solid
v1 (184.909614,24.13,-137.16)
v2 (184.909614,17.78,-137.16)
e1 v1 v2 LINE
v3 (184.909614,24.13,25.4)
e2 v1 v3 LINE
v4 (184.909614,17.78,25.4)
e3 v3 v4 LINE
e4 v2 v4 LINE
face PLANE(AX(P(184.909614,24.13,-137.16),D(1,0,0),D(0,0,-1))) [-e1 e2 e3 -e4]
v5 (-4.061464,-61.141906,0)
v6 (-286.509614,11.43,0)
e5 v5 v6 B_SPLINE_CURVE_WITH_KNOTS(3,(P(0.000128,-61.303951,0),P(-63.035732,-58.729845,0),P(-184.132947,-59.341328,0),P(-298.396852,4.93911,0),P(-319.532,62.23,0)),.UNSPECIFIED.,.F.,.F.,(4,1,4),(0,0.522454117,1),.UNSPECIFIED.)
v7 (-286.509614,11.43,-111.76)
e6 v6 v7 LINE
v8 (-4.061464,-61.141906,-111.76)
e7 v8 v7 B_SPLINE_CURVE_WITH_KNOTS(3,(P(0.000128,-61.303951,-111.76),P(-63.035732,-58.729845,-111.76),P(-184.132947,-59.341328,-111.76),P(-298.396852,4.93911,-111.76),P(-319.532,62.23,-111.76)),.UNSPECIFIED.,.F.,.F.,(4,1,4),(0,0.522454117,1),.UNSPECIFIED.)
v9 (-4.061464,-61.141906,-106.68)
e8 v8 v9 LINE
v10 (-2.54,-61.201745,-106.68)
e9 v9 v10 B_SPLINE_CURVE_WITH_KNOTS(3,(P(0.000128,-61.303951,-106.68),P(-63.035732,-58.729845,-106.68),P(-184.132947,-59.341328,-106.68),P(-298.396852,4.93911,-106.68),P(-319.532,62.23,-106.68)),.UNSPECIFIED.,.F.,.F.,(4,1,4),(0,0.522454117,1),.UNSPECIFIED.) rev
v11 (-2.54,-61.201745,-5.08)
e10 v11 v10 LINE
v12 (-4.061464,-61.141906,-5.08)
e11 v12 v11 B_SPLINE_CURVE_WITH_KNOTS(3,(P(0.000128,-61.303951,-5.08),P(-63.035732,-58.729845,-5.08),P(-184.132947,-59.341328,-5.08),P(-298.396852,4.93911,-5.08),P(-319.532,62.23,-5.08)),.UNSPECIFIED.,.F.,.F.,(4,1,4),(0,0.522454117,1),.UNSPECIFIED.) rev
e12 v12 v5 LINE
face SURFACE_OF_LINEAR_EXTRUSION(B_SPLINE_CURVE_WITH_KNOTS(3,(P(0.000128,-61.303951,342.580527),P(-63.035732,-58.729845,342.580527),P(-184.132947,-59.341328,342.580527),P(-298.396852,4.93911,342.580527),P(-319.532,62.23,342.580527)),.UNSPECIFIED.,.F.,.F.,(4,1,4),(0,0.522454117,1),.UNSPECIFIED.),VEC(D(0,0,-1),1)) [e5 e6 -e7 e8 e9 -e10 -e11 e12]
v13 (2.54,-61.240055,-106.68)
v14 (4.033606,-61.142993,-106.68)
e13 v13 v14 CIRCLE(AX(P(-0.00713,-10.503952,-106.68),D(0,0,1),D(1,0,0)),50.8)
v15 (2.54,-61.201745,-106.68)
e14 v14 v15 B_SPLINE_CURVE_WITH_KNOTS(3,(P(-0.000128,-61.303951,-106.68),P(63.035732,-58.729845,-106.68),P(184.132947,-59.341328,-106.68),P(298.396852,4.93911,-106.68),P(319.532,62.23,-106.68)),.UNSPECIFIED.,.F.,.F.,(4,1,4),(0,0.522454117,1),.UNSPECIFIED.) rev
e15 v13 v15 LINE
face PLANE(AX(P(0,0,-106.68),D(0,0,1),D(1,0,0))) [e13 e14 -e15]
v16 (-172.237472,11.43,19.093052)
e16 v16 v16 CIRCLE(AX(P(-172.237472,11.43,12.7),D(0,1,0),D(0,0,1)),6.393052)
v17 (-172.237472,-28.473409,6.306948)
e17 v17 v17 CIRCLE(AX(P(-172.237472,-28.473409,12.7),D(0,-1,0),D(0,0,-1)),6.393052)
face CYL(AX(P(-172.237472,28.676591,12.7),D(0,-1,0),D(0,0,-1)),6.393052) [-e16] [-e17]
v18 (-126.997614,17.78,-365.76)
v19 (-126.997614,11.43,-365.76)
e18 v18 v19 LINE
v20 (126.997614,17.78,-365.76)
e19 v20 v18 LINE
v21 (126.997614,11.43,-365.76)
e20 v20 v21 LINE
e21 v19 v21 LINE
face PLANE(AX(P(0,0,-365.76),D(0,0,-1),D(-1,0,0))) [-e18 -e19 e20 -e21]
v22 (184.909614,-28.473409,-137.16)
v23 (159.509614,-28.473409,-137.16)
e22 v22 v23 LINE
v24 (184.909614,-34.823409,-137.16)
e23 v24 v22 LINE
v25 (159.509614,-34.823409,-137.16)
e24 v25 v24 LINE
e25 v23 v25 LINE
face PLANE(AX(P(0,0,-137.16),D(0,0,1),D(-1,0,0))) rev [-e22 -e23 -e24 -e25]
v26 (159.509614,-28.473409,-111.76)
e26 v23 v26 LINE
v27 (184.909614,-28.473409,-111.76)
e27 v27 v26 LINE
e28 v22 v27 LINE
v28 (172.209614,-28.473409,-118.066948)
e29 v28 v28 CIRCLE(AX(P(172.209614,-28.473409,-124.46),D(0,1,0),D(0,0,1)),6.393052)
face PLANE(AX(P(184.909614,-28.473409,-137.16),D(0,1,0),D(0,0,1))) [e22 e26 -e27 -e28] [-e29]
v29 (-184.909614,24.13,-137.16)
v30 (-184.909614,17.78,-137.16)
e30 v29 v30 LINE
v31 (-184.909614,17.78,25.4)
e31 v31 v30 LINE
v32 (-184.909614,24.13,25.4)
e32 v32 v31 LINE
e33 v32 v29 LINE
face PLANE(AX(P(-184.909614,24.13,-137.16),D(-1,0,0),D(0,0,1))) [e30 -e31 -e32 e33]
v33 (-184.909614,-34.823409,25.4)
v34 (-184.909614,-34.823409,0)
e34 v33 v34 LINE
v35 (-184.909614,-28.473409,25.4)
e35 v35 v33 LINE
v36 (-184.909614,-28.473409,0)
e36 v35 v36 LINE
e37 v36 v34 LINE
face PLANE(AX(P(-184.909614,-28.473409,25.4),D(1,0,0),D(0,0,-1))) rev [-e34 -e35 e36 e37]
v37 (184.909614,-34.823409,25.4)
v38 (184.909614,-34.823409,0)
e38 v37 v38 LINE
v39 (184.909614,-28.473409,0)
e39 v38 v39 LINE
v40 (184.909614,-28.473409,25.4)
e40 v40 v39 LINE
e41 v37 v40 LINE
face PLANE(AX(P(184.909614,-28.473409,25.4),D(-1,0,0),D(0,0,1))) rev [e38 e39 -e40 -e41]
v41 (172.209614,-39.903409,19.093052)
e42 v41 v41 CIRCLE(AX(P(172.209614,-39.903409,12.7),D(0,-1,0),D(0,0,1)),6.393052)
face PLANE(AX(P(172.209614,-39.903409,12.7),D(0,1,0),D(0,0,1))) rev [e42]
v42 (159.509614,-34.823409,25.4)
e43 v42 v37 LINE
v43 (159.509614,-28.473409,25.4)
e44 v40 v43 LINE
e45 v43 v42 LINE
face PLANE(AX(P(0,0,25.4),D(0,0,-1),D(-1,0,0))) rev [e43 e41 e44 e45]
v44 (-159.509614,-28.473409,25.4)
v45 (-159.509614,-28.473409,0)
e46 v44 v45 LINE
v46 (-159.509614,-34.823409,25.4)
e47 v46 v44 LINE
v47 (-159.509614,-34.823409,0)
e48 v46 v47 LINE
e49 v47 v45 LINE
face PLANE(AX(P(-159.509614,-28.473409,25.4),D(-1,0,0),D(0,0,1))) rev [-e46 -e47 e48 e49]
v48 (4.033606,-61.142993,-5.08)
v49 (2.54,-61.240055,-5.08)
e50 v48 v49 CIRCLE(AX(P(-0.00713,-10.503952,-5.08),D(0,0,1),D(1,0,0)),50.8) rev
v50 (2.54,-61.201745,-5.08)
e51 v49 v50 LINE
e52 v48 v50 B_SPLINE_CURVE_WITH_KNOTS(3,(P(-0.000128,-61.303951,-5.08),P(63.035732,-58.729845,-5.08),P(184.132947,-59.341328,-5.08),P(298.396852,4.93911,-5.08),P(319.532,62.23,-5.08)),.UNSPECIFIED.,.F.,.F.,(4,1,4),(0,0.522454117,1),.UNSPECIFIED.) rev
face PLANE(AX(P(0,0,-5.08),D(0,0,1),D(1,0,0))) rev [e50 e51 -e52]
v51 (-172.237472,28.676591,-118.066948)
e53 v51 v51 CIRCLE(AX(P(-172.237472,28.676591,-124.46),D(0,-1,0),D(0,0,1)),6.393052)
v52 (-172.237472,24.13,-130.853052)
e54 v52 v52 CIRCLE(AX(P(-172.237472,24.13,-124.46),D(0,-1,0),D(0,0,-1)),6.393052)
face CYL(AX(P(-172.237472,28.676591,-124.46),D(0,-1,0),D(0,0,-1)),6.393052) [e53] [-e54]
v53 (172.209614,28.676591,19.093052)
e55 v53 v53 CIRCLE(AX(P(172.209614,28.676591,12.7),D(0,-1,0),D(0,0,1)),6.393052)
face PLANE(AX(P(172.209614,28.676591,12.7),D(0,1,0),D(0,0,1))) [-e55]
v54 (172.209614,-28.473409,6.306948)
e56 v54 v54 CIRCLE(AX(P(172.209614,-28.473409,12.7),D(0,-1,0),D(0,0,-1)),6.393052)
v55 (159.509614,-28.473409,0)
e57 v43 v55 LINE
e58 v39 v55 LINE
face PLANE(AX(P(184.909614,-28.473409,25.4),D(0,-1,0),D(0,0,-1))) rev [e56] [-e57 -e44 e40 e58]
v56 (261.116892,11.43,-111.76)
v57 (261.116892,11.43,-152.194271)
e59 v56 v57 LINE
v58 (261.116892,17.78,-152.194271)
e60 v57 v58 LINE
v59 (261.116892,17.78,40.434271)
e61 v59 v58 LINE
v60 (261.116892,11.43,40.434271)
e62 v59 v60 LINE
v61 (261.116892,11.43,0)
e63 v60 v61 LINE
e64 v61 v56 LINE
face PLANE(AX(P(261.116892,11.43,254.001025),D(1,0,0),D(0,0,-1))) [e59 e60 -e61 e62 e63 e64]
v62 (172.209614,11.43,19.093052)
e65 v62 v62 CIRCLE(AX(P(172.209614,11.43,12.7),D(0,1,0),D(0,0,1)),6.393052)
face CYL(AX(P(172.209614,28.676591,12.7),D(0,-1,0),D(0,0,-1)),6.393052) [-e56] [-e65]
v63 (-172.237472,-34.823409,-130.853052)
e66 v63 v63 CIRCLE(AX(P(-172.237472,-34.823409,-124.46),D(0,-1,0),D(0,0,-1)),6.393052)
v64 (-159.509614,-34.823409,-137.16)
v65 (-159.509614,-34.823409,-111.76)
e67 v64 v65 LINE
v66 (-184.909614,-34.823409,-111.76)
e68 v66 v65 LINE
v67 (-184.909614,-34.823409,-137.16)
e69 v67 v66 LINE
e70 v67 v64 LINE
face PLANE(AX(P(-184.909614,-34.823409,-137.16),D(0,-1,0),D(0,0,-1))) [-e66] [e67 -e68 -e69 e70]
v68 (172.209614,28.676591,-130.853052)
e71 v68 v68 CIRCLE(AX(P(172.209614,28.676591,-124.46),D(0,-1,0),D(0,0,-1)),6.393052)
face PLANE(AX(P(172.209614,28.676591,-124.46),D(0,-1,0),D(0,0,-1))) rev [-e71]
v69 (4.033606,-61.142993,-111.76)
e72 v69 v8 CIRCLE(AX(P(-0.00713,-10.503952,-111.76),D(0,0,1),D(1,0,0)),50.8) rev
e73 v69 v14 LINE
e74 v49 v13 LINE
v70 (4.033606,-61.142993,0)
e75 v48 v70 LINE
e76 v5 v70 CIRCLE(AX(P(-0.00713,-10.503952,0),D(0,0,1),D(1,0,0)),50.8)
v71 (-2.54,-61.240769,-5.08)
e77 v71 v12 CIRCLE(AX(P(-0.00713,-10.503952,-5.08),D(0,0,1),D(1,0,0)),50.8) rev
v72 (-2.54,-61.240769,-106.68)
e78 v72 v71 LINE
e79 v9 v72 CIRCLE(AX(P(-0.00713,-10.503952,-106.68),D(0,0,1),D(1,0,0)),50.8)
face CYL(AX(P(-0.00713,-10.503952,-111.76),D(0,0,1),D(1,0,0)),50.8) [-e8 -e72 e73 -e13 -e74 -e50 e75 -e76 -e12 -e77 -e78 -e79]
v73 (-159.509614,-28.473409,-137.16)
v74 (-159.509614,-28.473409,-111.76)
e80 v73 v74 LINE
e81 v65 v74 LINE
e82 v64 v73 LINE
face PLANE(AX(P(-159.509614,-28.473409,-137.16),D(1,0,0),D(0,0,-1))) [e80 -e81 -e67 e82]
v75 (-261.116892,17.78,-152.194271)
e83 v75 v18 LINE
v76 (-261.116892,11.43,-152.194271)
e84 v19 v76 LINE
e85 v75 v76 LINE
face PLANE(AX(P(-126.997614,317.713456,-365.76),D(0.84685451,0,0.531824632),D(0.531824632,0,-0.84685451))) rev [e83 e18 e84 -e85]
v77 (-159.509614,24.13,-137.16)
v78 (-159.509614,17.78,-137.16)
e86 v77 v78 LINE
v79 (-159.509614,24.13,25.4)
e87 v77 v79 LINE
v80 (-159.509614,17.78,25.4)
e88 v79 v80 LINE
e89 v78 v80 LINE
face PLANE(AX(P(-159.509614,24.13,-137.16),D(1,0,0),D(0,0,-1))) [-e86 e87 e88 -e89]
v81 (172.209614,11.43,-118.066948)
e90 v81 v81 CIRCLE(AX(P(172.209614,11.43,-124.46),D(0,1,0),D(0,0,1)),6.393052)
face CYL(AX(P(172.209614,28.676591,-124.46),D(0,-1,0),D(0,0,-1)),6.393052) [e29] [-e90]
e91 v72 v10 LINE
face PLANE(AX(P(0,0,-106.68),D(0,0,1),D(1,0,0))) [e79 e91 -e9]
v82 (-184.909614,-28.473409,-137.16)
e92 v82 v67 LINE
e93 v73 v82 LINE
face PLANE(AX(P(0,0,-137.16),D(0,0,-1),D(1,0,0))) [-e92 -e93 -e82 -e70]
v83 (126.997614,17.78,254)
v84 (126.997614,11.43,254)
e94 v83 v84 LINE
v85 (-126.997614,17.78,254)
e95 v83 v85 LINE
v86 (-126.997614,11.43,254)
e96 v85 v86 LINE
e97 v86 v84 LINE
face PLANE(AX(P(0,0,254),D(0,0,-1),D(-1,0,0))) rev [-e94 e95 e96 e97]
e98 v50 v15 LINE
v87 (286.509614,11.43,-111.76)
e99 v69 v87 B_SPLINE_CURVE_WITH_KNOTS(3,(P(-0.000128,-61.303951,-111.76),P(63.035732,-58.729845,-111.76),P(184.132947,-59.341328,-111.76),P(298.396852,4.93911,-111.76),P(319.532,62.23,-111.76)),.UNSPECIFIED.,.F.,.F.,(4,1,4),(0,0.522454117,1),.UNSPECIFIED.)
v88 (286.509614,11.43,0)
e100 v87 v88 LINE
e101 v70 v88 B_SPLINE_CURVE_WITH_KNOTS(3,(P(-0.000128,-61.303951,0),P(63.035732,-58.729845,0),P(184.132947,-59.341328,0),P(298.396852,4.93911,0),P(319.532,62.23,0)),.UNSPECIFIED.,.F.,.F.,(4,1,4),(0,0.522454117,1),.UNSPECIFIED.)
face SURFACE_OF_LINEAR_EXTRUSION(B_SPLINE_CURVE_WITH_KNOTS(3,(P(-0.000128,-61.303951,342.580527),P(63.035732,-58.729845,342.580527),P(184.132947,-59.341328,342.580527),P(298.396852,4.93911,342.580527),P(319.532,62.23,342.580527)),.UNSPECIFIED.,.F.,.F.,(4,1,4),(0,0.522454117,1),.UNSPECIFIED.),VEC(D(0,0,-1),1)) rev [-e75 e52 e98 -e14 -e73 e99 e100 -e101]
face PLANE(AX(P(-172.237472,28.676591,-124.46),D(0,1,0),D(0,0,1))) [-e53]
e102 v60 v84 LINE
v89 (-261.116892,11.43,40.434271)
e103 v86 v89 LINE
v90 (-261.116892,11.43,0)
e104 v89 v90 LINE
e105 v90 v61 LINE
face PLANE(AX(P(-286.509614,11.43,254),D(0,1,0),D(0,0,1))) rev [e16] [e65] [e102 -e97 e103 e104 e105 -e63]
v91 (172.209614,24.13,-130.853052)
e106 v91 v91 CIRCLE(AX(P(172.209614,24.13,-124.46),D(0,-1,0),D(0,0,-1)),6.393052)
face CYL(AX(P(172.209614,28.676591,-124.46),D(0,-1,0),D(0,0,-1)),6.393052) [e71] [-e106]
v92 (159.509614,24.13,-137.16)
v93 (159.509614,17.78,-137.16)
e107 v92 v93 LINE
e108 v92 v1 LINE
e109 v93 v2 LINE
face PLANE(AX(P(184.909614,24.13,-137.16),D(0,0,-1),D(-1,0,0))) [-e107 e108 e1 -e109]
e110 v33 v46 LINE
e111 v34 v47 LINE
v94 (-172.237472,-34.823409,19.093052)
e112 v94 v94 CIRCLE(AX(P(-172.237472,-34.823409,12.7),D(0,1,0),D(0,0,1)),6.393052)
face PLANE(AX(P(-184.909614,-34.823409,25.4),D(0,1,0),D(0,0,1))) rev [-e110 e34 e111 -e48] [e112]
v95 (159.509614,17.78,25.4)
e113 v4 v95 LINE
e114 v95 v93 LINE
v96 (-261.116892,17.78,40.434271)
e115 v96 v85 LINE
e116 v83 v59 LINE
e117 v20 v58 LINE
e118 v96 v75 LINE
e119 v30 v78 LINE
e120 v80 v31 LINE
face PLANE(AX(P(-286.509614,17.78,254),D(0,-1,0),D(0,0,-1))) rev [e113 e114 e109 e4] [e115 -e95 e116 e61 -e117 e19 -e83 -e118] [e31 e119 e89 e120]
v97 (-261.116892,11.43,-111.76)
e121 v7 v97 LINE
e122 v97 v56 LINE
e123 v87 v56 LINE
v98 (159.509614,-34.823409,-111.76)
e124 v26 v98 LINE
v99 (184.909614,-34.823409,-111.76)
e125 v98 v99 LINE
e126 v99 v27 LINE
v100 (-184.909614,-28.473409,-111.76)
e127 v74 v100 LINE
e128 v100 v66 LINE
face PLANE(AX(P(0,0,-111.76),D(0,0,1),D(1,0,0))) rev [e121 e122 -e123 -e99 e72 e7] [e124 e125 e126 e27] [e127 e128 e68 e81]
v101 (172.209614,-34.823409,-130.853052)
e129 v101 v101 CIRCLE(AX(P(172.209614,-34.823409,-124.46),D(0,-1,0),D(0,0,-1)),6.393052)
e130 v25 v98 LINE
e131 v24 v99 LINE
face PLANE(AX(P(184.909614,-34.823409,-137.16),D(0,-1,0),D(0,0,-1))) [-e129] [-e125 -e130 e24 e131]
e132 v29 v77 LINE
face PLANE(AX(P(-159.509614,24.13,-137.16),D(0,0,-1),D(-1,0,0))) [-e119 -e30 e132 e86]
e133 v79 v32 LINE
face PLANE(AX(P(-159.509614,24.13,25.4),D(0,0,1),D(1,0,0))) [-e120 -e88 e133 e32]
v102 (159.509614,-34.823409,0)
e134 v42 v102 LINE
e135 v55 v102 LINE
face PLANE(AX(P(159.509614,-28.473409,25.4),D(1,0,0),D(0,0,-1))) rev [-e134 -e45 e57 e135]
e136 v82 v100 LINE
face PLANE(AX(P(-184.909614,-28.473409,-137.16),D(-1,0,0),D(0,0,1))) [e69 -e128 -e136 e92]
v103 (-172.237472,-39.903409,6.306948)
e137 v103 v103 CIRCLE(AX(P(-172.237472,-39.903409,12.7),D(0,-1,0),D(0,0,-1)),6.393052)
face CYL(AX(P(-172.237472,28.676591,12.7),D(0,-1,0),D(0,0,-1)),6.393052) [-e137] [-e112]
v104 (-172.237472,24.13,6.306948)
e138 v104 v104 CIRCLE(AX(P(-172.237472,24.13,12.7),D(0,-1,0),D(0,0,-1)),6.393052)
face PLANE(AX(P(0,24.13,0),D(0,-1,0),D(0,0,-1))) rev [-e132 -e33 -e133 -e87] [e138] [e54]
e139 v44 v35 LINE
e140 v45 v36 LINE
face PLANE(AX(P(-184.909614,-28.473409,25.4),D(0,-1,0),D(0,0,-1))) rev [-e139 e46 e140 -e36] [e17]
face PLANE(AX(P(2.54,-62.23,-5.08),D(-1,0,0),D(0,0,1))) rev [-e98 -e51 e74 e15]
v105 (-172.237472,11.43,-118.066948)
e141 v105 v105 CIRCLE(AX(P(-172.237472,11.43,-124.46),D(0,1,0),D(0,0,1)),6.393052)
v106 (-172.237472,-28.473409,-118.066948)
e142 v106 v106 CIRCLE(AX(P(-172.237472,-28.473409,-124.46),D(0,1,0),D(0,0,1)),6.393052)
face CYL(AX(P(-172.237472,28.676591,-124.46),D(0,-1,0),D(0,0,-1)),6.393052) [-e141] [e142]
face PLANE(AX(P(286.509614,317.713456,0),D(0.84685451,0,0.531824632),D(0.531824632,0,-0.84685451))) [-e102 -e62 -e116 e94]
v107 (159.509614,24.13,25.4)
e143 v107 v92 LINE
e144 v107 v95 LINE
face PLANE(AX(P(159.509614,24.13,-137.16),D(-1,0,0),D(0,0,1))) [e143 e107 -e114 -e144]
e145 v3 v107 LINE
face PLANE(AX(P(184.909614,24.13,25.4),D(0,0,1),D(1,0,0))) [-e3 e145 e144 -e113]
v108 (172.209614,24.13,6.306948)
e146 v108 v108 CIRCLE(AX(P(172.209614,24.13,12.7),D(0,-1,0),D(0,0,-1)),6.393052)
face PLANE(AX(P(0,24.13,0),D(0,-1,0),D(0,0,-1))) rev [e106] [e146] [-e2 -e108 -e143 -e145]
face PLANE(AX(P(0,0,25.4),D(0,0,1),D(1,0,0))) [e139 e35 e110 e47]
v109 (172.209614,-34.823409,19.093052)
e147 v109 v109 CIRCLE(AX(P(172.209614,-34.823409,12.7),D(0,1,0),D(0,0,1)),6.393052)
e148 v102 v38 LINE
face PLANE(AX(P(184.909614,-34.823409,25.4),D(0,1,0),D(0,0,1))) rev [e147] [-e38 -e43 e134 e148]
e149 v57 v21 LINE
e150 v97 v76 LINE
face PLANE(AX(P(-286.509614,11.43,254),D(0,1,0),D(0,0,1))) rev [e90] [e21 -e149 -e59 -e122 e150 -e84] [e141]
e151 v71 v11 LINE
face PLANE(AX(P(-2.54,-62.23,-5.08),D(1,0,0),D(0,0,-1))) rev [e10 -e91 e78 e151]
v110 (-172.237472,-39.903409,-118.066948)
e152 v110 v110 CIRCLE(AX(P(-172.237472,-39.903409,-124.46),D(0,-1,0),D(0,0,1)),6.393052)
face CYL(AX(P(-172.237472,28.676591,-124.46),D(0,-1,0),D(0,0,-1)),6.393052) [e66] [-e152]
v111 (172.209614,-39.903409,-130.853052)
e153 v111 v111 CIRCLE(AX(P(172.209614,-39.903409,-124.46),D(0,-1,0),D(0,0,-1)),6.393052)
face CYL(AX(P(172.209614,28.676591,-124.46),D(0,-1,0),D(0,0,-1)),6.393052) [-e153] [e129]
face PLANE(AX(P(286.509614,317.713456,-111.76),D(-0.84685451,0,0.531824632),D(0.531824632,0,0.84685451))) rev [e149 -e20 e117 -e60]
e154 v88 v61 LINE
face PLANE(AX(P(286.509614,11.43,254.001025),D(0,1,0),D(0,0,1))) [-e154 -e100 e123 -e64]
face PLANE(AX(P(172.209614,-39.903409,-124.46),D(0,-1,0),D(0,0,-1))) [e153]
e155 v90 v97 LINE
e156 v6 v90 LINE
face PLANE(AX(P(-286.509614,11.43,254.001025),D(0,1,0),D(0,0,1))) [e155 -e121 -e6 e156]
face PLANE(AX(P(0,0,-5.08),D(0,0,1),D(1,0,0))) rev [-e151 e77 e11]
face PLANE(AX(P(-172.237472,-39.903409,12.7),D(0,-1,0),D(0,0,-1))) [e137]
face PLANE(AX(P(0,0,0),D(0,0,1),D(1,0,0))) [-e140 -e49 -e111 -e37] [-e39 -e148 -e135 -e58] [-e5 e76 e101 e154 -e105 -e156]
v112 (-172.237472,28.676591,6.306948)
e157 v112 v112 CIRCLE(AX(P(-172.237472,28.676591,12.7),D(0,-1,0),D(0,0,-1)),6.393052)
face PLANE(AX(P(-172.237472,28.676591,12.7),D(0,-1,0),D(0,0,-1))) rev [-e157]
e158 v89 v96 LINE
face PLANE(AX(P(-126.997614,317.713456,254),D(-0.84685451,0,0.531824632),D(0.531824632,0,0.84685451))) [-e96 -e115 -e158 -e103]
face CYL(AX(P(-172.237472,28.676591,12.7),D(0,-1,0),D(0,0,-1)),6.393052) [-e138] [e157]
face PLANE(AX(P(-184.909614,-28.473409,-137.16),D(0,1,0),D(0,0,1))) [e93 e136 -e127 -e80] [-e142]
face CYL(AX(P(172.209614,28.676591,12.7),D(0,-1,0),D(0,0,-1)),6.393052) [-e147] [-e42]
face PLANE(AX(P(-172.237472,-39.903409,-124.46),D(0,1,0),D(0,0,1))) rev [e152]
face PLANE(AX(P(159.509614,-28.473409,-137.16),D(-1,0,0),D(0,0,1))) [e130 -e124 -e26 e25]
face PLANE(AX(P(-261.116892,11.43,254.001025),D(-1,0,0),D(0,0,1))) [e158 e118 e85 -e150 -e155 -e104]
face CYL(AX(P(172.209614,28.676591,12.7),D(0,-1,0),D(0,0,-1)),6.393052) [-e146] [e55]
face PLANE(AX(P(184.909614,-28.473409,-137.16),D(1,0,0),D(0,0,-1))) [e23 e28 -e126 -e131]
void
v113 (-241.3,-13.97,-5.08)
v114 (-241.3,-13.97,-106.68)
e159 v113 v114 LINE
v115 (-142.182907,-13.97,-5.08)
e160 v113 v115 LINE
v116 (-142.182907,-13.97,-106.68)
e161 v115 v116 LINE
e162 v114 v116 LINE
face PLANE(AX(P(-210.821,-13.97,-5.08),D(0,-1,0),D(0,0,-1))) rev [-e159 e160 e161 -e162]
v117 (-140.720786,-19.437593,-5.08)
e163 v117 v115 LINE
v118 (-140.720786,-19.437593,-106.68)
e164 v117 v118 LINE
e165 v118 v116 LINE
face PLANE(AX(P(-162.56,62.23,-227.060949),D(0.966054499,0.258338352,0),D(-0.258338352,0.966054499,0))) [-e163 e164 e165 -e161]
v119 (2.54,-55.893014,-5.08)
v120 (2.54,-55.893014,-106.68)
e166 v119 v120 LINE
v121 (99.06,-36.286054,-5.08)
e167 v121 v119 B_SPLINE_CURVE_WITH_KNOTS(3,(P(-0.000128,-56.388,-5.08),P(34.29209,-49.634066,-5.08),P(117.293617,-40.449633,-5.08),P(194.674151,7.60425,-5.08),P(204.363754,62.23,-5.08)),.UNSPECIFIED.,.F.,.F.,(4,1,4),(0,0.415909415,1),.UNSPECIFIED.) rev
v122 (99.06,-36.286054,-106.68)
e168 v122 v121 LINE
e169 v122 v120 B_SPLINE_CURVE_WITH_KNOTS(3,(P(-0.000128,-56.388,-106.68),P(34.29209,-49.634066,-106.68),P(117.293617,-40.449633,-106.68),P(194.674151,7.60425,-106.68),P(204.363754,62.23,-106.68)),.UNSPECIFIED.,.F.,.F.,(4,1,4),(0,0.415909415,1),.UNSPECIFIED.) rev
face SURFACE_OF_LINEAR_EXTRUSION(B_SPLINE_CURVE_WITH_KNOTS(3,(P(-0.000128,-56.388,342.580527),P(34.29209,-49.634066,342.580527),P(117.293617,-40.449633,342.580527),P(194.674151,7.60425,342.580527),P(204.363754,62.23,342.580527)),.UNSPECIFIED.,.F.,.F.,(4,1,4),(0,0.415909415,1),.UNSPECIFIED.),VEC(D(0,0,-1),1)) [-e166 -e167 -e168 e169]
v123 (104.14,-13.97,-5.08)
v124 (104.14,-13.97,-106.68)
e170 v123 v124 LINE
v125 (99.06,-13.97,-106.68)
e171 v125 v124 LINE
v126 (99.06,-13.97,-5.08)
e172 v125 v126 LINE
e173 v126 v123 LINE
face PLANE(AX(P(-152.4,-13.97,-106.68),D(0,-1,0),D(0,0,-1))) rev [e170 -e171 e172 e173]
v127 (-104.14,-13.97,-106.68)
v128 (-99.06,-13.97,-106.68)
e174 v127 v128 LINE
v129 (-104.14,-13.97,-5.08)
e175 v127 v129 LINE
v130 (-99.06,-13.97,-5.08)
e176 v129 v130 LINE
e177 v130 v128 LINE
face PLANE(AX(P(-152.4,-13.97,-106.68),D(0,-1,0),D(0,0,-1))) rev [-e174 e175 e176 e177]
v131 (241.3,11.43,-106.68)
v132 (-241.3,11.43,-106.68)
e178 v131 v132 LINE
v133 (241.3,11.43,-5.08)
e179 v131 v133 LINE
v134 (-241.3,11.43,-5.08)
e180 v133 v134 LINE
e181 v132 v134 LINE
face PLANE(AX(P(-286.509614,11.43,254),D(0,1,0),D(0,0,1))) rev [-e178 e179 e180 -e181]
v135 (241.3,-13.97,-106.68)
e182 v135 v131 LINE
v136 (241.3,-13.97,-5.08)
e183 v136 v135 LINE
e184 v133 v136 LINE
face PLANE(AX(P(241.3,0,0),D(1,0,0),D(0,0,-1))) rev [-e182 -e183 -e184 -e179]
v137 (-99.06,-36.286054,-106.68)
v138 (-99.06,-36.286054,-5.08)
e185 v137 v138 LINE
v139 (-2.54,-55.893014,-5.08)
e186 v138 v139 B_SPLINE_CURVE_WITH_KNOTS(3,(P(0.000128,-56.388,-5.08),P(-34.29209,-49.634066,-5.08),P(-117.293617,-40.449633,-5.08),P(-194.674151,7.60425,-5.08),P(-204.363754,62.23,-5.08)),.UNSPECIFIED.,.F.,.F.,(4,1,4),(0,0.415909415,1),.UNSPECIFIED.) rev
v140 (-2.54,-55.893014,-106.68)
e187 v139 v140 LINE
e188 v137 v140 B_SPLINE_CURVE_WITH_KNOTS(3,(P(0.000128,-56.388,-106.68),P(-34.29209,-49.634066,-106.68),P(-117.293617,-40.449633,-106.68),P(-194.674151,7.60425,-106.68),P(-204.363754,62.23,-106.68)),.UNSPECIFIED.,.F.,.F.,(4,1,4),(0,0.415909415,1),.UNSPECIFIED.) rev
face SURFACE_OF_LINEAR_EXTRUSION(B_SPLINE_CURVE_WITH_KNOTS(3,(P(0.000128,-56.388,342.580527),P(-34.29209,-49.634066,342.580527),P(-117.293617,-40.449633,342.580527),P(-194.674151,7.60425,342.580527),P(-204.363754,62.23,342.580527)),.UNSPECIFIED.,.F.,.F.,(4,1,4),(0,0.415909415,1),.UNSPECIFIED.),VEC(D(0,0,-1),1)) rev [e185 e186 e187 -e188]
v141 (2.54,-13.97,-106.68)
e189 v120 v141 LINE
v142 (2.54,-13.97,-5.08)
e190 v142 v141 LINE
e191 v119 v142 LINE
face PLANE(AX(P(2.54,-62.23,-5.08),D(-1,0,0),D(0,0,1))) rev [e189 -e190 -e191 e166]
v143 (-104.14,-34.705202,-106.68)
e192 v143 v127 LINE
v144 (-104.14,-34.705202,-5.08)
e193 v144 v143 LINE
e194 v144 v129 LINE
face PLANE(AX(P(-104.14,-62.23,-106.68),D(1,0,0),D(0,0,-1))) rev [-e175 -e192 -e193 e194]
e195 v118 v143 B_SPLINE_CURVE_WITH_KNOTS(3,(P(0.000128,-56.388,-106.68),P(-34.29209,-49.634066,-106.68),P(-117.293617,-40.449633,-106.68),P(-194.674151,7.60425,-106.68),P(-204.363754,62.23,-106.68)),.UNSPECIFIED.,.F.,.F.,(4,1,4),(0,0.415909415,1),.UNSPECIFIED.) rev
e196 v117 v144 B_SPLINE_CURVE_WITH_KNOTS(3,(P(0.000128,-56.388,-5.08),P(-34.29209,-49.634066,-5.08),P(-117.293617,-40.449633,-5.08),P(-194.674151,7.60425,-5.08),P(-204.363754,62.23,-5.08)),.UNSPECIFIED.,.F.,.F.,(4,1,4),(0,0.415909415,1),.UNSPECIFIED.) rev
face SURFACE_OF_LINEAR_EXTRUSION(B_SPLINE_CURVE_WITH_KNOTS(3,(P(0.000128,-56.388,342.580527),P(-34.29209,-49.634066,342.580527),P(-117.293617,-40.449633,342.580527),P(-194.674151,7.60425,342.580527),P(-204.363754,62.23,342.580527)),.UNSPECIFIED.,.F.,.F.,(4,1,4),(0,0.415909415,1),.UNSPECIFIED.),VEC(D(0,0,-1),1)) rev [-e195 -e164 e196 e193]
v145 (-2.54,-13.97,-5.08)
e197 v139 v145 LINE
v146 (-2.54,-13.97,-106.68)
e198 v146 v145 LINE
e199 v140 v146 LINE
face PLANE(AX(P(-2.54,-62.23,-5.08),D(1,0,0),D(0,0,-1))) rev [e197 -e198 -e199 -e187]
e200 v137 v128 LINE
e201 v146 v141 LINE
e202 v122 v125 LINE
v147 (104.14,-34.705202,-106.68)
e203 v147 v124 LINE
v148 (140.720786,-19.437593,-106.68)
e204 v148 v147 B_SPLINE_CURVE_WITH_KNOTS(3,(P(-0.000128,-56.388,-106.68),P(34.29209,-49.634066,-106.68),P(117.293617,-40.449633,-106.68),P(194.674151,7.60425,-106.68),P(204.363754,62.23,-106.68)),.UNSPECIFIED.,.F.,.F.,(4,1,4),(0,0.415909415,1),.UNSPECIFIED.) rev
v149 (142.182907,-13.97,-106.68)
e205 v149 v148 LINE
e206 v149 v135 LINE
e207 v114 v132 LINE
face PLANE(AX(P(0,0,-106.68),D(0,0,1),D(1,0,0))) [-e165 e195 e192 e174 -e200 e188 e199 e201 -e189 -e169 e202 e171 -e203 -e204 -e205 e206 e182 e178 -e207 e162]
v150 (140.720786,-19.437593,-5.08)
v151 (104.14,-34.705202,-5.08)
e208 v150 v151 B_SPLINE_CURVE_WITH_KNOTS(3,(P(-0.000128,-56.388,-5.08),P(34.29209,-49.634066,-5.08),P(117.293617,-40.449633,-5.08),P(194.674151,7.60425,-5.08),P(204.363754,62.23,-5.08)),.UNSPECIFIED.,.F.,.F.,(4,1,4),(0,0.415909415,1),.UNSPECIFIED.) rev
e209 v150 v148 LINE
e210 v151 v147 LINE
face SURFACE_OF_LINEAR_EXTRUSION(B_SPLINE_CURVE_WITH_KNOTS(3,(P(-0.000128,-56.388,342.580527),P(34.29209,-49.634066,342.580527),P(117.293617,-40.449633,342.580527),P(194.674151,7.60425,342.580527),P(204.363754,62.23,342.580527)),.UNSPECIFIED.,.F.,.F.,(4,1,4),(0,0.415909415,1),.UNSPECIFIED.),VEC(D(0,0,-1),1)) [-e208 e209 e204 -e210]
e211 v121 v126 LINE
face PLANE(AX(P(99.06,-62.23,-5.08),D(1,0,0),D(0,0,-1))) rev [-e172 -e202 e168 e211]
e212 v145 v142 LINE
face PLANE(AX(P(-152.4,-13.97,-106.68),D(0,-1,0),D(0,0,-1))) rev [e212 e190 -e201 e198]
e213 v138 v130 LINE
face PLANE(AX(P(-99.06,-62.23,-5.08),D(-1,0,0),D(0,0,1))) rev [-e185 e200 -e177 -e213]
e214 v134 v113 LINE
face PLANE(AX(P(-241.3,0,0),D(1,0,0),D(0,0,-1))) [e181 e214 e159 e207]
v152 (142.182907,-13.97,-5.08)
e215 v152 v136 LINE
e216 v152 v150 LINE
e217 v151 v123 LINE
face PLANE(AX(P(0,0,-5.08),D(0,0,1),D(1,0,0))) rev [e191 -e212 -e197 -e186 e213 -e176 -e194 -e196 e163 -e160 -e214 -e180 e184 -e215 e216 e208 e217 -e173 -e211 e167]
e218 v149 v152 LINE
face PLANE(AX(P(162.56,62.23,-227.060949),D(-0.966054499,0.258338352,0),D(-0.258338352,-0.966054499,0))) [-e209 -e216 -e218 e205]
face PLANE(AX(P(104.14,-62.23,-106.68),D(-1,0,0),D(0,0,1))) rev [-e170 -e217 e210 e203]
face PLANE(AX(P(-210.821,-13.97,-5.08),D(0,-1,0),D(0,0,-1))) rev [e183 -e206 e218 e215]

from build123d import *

# Parameters (mm, degrees)
BOSS_EXTRUDE1_DEPTH                 = 111.76
SKETCH5_W                           = 304.8
SKETCH5_H                           = 25.4
CUT_EXTRUDE3_DEPTH                  = 101.6
CUT_EXTRUDE4_DEPTH                  = 227.288199427
CUT_EXTRUDE4_DEPTH_BACK             = 227.288199427
SKETCH3_W                           = 96.52
SKETCH3_H                           = 101.6
SKETCH3_W_2                         = 48.26
CUT_EXTRUDE5_REACH                  = 288.663
SKETCH6_W                           = 38.1
SKETCH6_H                           = 50.8
SKETCH7_W                           = 81.28
SKETCH7_H                           = 50.8
BOSS_EXTRUDE2_DEPTH                 = 5.08
SKETCH9_W                           = 5.08
SKETCH9_H                           = 95.25
BOSS_EXTRUDE3_DEPTH                 = 10.16
SKETCH10_W                          = 5.08
SKETCH10_H                          = 95.206439839
BOSS_EXTRUDE4_DEPTH                 = 10.16
CUT_EXTRUDE7_REACH                  = 208.854
FILLET1_R                           = 50.8
BOSS_EXTRUDE5_REACH                 = 208.854
CUT_EXTRUDE8_REACH                  = 248.593
CUT_EXTRUDE8_END_RADIUS             = 126.32098656
CUT_EXTRUDE8_DIRECTION_2_REACH      = 248.593
CUT_EXTRUDE8_DIRECTION_2_END_RADIUS = 126.32098656
BOSS_EXTRUDE6_REACH                 = 248.593
CUT_EXTRUDE9_DEPTH                  = 241.3
CUT_EXTRUDE9_DEPTH_BACK             = 241.3
CUT_EXTRUDE10_REACH                 = 346.185
SKETCH16_W                          = 38.1
SKETCH16_H                          = 50.8
CUT_EXTRUDE10_DIRECTION_2_REACH     = 346.185
CUT_EXTRUDE11_START                 = -319.532
SKETCH17_W                          = 111.76
SKETCH17_H                          = 50.800000001
CUT_EXTRUDE11_DEPTH                 = 639.064
BOSS_EXTRUDE7_DEPTH                 = 254
BOSS_EXTRUDE7_DEPTH_BACK            = 365.76
SKETCH19_W                          = 573.01922816
SKETCH19_H                          = 6.35
CUT_EXTRUDE12_DEPTH                 = 6.35
CUT_EXTRUDE13_REACH                 = 470.643
SKETCH21_W                          = 25.392722083
SKETCH21_H                          = 6.35
CUT_EXTRUDE13_DIRECTION_2_REACH     = 470.643
SKETCH22_W                          = 25.4
SKETCH22_H                          = 6.35
BOSS_EXTRUDE8_DEPTH                 = 25.4
SKETCH23_W                          = 25.4
SKETCH23_H                          = 162.56
BOSS_EXTRUDE9_DEPTH                 = 12.7
BOSS_EXTRUDE10_DEPTH                = 5.08
BOSS_EXTRUDE10_DEPTH_BACK           = 63.5
SKETCH24_R                          = 6.393052053


with BuildPart() as part:
    # Sketch1 → Boss-Extrude1 (new body)
    with BuildSketch(Plane.XY):
        Polygon((-152.4, 62.23), (-152.4, -33.02), (0, -62.23), (152.4, -32.976439839), (152.4, 62.23), align=None)
    extrude(amount=-BOSS_EXTRUDE1_DEPTH)

    # Sketch5 → Cut-Extrude3 (cut)
    with BuildSketch(Plane.XY.offset(-5.08)):
        with Locations((0, -1.27)):
            Rectangle(SKETCH5_W, SKETCH5_H)
    extrude(amount=-CUT_EXTRUDE3_DEPTH, mode=Mode.SUBTRACT)

    # Sketch3 → Cut-Extrude4 (cut, two sides: drawn at the far end of the back side and taken through both)
    with BuildSketch(Plane(origin=(0, 62.23, 0), x_dir=(1, 0, 0), z_dir=(0, 1, 0)).offset(-CUT_EXTRUDE4_DEPTH_BACK)):
        with Locations((-50.8, 55.88)):
            Rectangle(SKETCH3_W, SKETCH3_H)
        with Locations((50.8, 55.88)):
            Rectangle(SKETCH3_W, SKETCH3_H)
        with Locations((-128.27, 55.88)):
            Rectangle(SKETCH3_W_2, SKETCH3_H)
        with Locations((128.27, 55.88)):
            Rectangle(SKETCH3_W_2, SKETCH3_H)
    extrude(amount=CUT_EXTRUDE4_DEPTH + CUT_EXTRUDE4_DEPTH_BACK, mode=Mode.SUBTRACT)

    # Cut-Extrude5: up to this face of the body (flat: up to its plane)
    cut_extrude5_end = Plane(part.part.faces().sort_by_distance((104.14, 36.83, -55.88))[0])
    # Sketch6 → Cut-Extrude5 (cut, up to the picked face)
    with BuildSketch(Plane.ZY.offset(104.14), mode=Mode.PRIVATE) as cut_extrude5_sk1:
        with Locations((-55.932057734, 36.83)):
            Rectangle(SKETCH6_W, SKETCH6_H)
    cut_extrude5_tool1 = split(extrude(cut_extrude5_sk1.sketch, amount=-CUT_EXTRUDE5_REACH, mode=Mode.PRIVATE), bisect_by=cut_extrude5_end, keep=Keep.BOTH, mode=Mode.PRIVATE)
    add(cut_extrude5_tool1.solids().sort_by(Axis((-104.14, 36.83, -55.932058), (1, 0, 0)))[0], mode=Mode.SUBTRACT)

    # Sketch7 → Boss-Extrude2 (add)
    with BuildSketch(Plane(origin=(0, 0, -36.882057734), x_dir=(-1, 0, 0), z_dir=(0, 0, -1))):
        with Locations((0, 36.83)):
            Rectangle(SKETCH7_W, SKETCH7_H)
        with Locations((101.6, 36.83)):
            Rectangle(SKETCH7_W, SKETCH7_H)
        with Locations((-101.6, 36.83)):
            Rectangle(SKETCH7_W, SKETCH7_H)
    boss_extrude2 = extrude(amount=-BOSS_EXTRUDE2_DEPTH)

    # Mirror1: Boss-Extrude2 across plane
    add(boss_extrude2.mirror(Plane(origin=(0, 0, -55.932057734), x_dir=(1, 0, 0), z_dir=(0, 0, -1))))

    # Sketch9 → Boss-Extrude3 (add)
    with BuildSketch(Plane.ZY.offset(152.4)):
        with Locations((-109.22, 14.605)):
            Rectangle(SKETCH9_W, SKETCH9_H)
        with Locations((-2.54, 14.605)):
            Rectangle(SKETCH9_W, SKETCH9_H)
    extrude(amount=BOSS_EXTRUDE3_DEPTH)

    # Sketch10 → Boss-Extrude4 (add)
    with BuildSketch(Plane(origin=(152.4, 0, 0), x_dir=(0, 0, -1), z_dir=(1, 0, 0))):
        with Locations((2.54, 14.626780081)):
            Rectangle(SKETCH10_W, SKETCH10_H)
        with Locations((109.22, 14.626780081)):
            Rectangle(SKETCH10_W, SKETCH10_H)
    extrude(amount=BOSS_EXTRUDE4_DEPTH)

    # Cut-Extrude7: up to this face of the body (flat: up to its plane)
    cut_extrude7_end = Plane(part.part.faces().sort_by_distance((-0.011490312, 7.400814094, -111.76))[0])
    # Sketch11 → Cut-Extrude7 (cut, up to the picked face)
    with BuildSketch(Plane.XY, mode=Mode.PRIVATE) as cut_extrude7_sk1:
        Polygon((-162.56, -12.7), (-119.696308585, -39.288207521), (-152.4, -33.02), (-162.56, -33.02), align=None)
    cut_extrude7_tool1 = split(extrude(cut_extrude7_sk1.sketch, amount=-CUT_EXTRUDE7_REACH, mode=Mode.PRIVATE), bisect_by=cut_extrude7_end, keep=Keep.BOTH, mode=Mode.PRIVATE)
    # Sketch11 → Cut-Extrude7 (cut, up to the picked face)
    with BuildSketch(Plane.XY, mode=Mode.PRIVATE) as cut_extrude7_sk2:
        Polygon((152.4, -33.02), (162.56, -33.02), (162.56, -12.7), (119.696308585, -39.288207521), align=None)
    cut_extrude7_tool2 = split(extrude(cut_extrude7_sk2.sketch, amount=-CUT_EXTRUDE7_REACH, mode=Mode.PRIVATE), bisect_by=cut_extrude7_end, keep=Keep.BOTH, mode=Mode.PRIVATE)
    add(cut_extrude7_tool1.solids().sort_by(Axis((-148.539263, -27.801749, 0), (0, 0, -1)))[0], mode=Mode.SUBTRACT)
    add(cut_extrude7_tool2.solids().sort_by(Axis((148.539263, -27.801749, 0), (0, 0, -1)))[0], mode=Mode.SUBTRACT)

    # Fillet1
    # the kernel refuses this fillet: 50.8 mm, written as the material it takes off along each edge
    with BuildSketch(Plane(origin=(-162.56, -12.7, 70.671047804), x_dir=(0.8497897447130388, -0.5271217978613181, 0), z_dir=(0, 0, -1)), Plane(origin=(-162.56, -12.7, -36.008952196), x_dir=(0.8497897447130388, -0.5271217978613181, 0), z_dir=(0, 0, -1)), Plane(origin=(162.56, -12.7, 70.671047804), x_dir=(0, 1, 0), z_dir=(0, 0, -1))) as fillet1_piece_1:
        with BuildLine():
            CenterArc((FILLET1_R * 0.556464943335, -FILLET1_R), FILLET1_R, 90, 58.188808221)
            Line((-FILLET1_R * 0.293324801378, -FILLET1_R * 0.472878202139), (0, 0))
            Line((0, 0), (FILLET1_R * 0.556464943335, 0))
        make_face()
    extrude(amount=146.422095607, mode=Mode.SUBTRACT)
    with BuildSketch(Plane(origin=(-119.696308585, -39.288207521, -83.186546401), x_dir=(0.9821230119270369, -0.18824024395268216, 0), z_dir=(0, 0, -1)), Plane(origin=(-119.696308585, -39.288207521, 23.493453599), x_dir=(0.9821230119270369, -0.18824024395268216, 0), z_dir=(0, 0, -1))) as fillet1_piece_2:
        with BuildLine():
            CenterArc((FILLET1_R * 0.184987823618, -FILLET1_R), FILLET1_R, 90, 20.961087149)
            Line((-FILLET1_R * 0.172745995297, -FILLET1_R * 0.0661764005955), (0, 0))
            Line((0, 0), (FILLET1_R * 0.184987823618, 0))
        make_face()
    extrude(amount=52.066907199, mode=Mode.SUBTRACT)
    with BuildSketch(Plane(origin=(162.56, -12.7, -36.008952196), x_dir=(-0.8497897447130388, -0.5271217978613181, 0), z_dir=(0, 0, -1))) as fillet1_piece_3:
        with BuildLine():
            CenterArc((FILLET1_R * 0.556464943335, FILLET1_R), FILLET1_R, 211.811191779, 58.188808221)
            Line((-FILLET1_R * 0.293324801378, FILLET1_R * 0.472878202139), (0, 0))
            Line((0, 0), (FILLET1_R * 0.556464943335, 0))
        make_face()
    extrude(amount=146.422095607, mode=Mode.SUBTRACT)
    with BuildSketch(Plane(origin=(119.776180176, -39.238663434, 23.475348992), x_dir=(-0.9820710795721669, -0.18851099349363817, 0), z_dir=(0, 0, -1)), Plane(origin=(119.776180176, -39.238663434, -83.204651008), x_dir=(-0.9820710795721669, -0.18851099349363817, 0), z_dir=(0, 0, -1))) as fillet1_piece_4:
        with BuildLine():
            CenterArc((FILLET1_R * 0.184845267653, FILLET1_R), FILLET1_R, 249.054708445, 20.945291555)
            Line((-FILLET1_R * 0.172631096402, FILLET1_R * 0.0660778141933), (0, 0))
            Line((0, 0), (FILLET1_R * 0.184845267653, 0))
        make_face()
    extrude(amount=52.030697984, mode=Mode.SUBTRACT)
    with BuildSketch(Plane(origin=(0, -62.23, 24.359816254), x_dir=(-0.982123011927037, 0.1882402439526816, 0), z_dir=(0, 0, -1))) as fillet1_piece_5:
        with BuildLine():
            CenterArc((FILLET1_R * 0.191809576801, FILLET1_R), FILLET1_R, 248.283995147, 21.716004853)
            Line((-FILLET1_R * 0.178196707507, FILLET1_R * 0.0709707488072), (0, 0))
            Line((0, 0), (FILLET1_R * 0.191809576801, 0))
        make_face()
    extrude(amount=160.479632508, mode=Mode.SUBTRACT)

    # Boss-Extrude5: up to this face of the body (flat: up to its plane)
    boss_extrude5_end = Plane(part.part.faces().sort_by_distance((-0.004732582, 8.379000895, -111.76))[0])
    # Sketch12 → Boss-Extrude5 (add, up to the picked face)
    with BuildSketch(Plane.XY, mode=Mode.PRIVATE) as boss_extrude5_sk1:
        with BuildLine():
            Line((-162.56, 62.23), (-210.82, 62.23))
            ThreePointArc((-210.82, 62.23), (-185.525923559, 8.586514121), (-138.537787331, -27.60089991))
            Line((-138.537787331, -27.60089991), (-162.56, 62.23))
        make_face()
    boss_extrude5_tool1 = split(extrude(boss_extrude5_sk1.sketch, amount=-BOSS_EXTRUDE5_REACH, mode=Mode.PRIVATE), bisect_by=boss_extrude5_end, keep=Keep.BOTH, mode=Mode.PRIVATE)
    # Sketch12 → Boss-Extrude5 (add, up to the picked face)
    with BuildSketch(Plane.XY, mode=Mode.PRIVATE) as boss_extrude5_sk2:
        with BuildLine():
            Line((162.56, 62.23), (210.82, 62.23))
            ThreePointArc((210.82, 62.23), (185.525923559, 8.586514121), (138.537787331, -27.60089991))
            Line((138.537787331, -27.60089991), (162.56, 62.23))
        make_face()
    boss_extrude5_tool2 = split(extrude(boss_extrude5_sk2.sketch, amount=-BOSS_EXTRUDE5_REACH, mode=Mode.PRIVATE), bisect_by=boss_extrude5_end, keep=Keep.BOTH, mode=Mode.PRIVATE)
    add(boss_extrude5_tool1.solids().sort_by(Axis((-173.436994, 26.131053, 0), (0, 0, -1)))[0])
    add(boss_extrude5_tool2.solids().sort_by(Axis((173.436994, 26.131053, 0), (0, 0, -1)))[0])

    # Cut-Extrude8: up to this cylinder (the profile starts inside it)
    cut_extrude8_end = Plane(origin=(-87.109319049, 87.777192878, -55.90231), z_dir=(0, 0, 1)) * Cylinder(CUT_EXTRUDE8_END_RADIUS, 750.827973119, mode=Mode.PRIVATE)
    # Sketch13 → Cut-Extrude8 (cut, up to the surface)
    with BuildSketch(Plane(origin=(0, 0, 0), x_dir=(0, 0, -1), z_dir=(1, 0, 0)), mode=Mode.PRIVATE) as cut_extrude8_sk1:
        Polygon((36.882057734, 62.23), (36.882057734, 11.43), (5.08, 11.43), (5.08, -13.97), (106.68, -13.97), (106.68, 11.43), (74.982057734, 11.43), (74.982057734, 62.23), align=None)
    cut_extrude8_tool1 = extrude(cut_extrude8_sk1.sketch, amount=-CUT_EXTRUDE8_REACH, mode=Mode.PRIVATE) & cut_extrude8_end
    add(cut_extrude8_tool1.solids().sort_by_distance((0, 15.058571, -55.90231))[0], mode=Mode.SUBTRACT)

    # Cut-Extrude8 direction 2: up to this cylinder (the profile starts inside it)
    cut_extrude8_direction_2_end = Plane(origin=(87.109319049, 87.777192878, -55.90231), z_dir=(0, 0, 1)) * Cylinder(CUT_EXTRUDE8_DIRECTION_2_END_RADIUS, 750.827973119, mode=Mode.PRIVATE)
    # Sketch13 → Cut-Extrude8 direction 2 (cut, up to the surface)
    with BuildSketch(Plane(origin=(0, 0, 0), x_dir=(0, 0, -1), z_dir=(1, 0, 0)), mode=Mode.PRIVATE) as cut_extrude8_direction_2_sk1:
        Polygon((36.882057734, 62.23), (36.882057734, 11.43), (5.08, 11.43), (5.08, -13.97), (106.68, -13.97), (106.68, 11.43), (74.982057734, 11.43), (74.982057734, 62.23), align=None)
    cut_extrude8_direction_2_tool1 = extrude(cut_extrude8_direction_2_sk1.sketch, amount=CUT_EXTRUDE8_DIRECTION_2_REACH, mode=Mode.PRIVATE) & cut_extrude8_direction_2_end
    add(cut_extrude8_direction_2_tool1.solids().sort_by_distance((0, 15.058571, -55.90231))[0], mode=Mode.SUBTRACT)

    # Boss-Extrude6: up to this face of the body (flat: up to its plane)
    boss_extrude6_end = Plane(part.part.faces().sort_by_distance((-0.004136206, 11.247831231, 0))[0])
    # Sketch14 → Boss-Extrude6 (add, up to the picked face)
    with BuildSketch(Plane(origin=(0, 0, -111.76), x_dir=(-1, 0, 0), z_dir=(0, 0, -1)), mode=Mode.PRIVATE) as boss_extrude6_sk1:
        with BuildLine():
            Line((-204.363754457, 62.23), (-319.532, 62.23))
            add(Edge.make_bspline(
                [(0.000127649, -61.30395141), (-63.035732171, -58.729844517), (-184.13294652, -59.341328161), (-298.396851531, 4.939109547), (-319.532, 62.23)],
                knots=[0, 0, 0, 0, 0.522454117, 1, 1, 1, 1], degree=3))
            Line((0.000127649, -61.30395141), (0.000127649, -56.388))
            add(Edge.make_bspline(
                [(0.000127649, -56.388), (-34.292089751, -49.634065585), (-117.293617019, -40.449633361), (-194.674150599, 7.604249577), (-204.363754457, 62.23)],
                knots=[0, 0, 0, 0, 0.415909415, 1, 1, 1, 1], degree=3))
        make_face()
    boss_extrude6_tool1 = split(extrude(boss_extrude6_sk1.sketch, amount=-BOSS_EXTRUDE6_REACH, mode=Mode.PRIVATE), bisect_by=boss_extrude6_end, keep=Keep.BOTH, mode=Mode.PRIVATE)
    # Sketch14 → Boss-Extrude6 (add, up to the picked face)
    with BuildSketch(Plane(origin=(0, 0, -111.76), x_dir=(-1, 0, 0), z_dir=(0, 0, -1)), mode=Mode.PRIVATE) as boss_extrude6_sk2:
        with BuildLine():
            Line((0.000127649, -56.388), (0.000127649, -61.30395141))
            add(Edge.make_bspline(
                [(0.000127649, -61.30395141), (63.035732171, -58.729844517), (184.13294652, -59.341328161), (298.396851531, 4.939109547), (319.532, 62.23)],
                knots=[0, 0, 0, 0, 0.522454117, 1, 1, 1, 1], degree=3))
            Line((319.532, 62.23), (204.363754457, 62.23))
            add(Edge.make_bspline(
                [(0.000127649, -56.388), (34.292089751, -49.634065585), (117.293617019, -40.449633361), (194.674150599, 7.604249577), (204.363754457, 62.23)],
                knots=[0, 0, 0, 0, 0.415909415, 1, 1, 1, 1], degree=3))
        make_face()
    boss_extrude6_tool2 = split(extrude(boss_extrude6_sk2.sketch, amount=-BOSS_EXTRUDE6_REACH, mode=Mode.PRIVATE), bisect_by=boss_extrude6_end, keep=Keep.BOTH, mode=Mode.PRIVATE)
    add(boss_extrude6_tool1.solids().sort_by(Axis((202.795825, 2.026931, -111.76), (0, 0, 1)))[0])
    add(boss_extrude6_tool2.solids().sort_by(Axis((-202.795984, 2.026638, -111.76), (0, 0, 1)))[0])

    # Sketch15 → Cut-Extrude9 (cut, two sides: drawn at the far end of the back side and taken through both)
    with BuildSketch(Plane(origin=(0, 0, 0), x_dir=(0, 0, -1), z_dir=(1, 0, 0)).offset(-CUT_EXTRUDE9_DEPTH_BACK)):
        Polygon((36.882057734, 62.23), (36.882057734, 11.43), (5.08, 11.43), (5.08, -13.97), (106.68, -13.97), (106.68, 11.43), (74.982057734, 11.43), (74.982057734, 62.23), align=None)
    extrude(amount=CUT_EXTRUDE9_DEPTH + CUT_EXTRUDE9_DEPTH_BACK, mode=Mode.SUBTRACT)

    # Sketch16 → Cut-Extrude10 (cut, up to next)
    with BuildSketch(Plane(origin=(0, 0, 0), x_dir=(0, 0, -1), z_dir=(1, 0, 0)), mode=Mode.PRIVATE) as cut_extrude10_sk1:
        with Locations((55.932057734, 36.83)):
            Rectangle(SKETCH16_W, SKETCH16_H)
    cut_extrude10_tool1 = extrude(cut_extrude10_sk1.sketch, amount=-CUT_EXTRUDE10_REACH, mode=Mode.PRIVATE) & part.part
    add(cut_extrude10_tool1.solids().sort_by_distance((0, 36.83, -55.932058))[0], mode=Mode.SUBTRACT)

    # Sketch16 → Cut-Extrude10 direction 2 (cut, up to next)
    with BuildSketch(Plane(origin=(0, 0, 0), x_dir=(0, 0, -1), z_dir=(1, 0, 0)), mode=Mode.PRIVATE) as cut_extrude10_direction_2_sk1:
        with Locations((55.932057734, 36.83)):
            Rectangle(SKETCH16_W, SKETCH16_H)
    cut_extrude10_direction_2_tool1 = extrude(cut_extrude10_direction_2_sk1.sketch, amount=CUT_EXTRUDE10_DIRECTION_2_REACH, mode=Mode.PRIVATE) & part.part
    add(cut_extrude10_direction_2_tool1.solids().sort_by_distance((0, 36.83, -55.932058))[0], mode=Mode.SUBTRACT)

    # Sketch17 → Cut-Extrude11 (cut)
    with BuildSketch(Plane(origin=(0, 0, 0), x_dir=(0, 0, -1), z_dir=(1, 0, 0)).offset(CUT_EXTRUDE11_START)):
        with Locations((55.88, 36.83)):
            Rectangle(SKETCH17_W, SKETCH17_H)
    extrude(amount=CUT_EXTRUDE11_DEPTH, mode=Mode.SUBTRACT)

    # Sketch19 → Boss-Extrude7 (add, two sides: drawn at the far end of the back side and taken through both)
    with BuildSketch(Plane.XY.offset(-BOSS_EXTRUDE7_DEPTH_BACK)):
        with Locations((0, 14.604999999)):
            Rectangle(SKETCH19_W, SKETCH19_H)
    extrude(amount=BOSS_EXTRUDE7_DEPTH + BOSS_EXTRUDE7_DEPTH_BACK)

    # Sketch20 → Cut-Extrude12 (cut)
    with BuildSketch(Plane.XZ.offset(-11.429999999)):
        Polygon((286.50961408, 0), (126.99761408, 254), (286.50961408, 254), align=None)
        Polygon((-126.99761408, 254), (-286.50961408, 0), (-286.50961408, 254), align=None)
        Polygon((-126.99761408, -365.76), (-286.50961408, -365.76), (-286.50961408, -111.76), align=None)
        Polygon((126.99761408, -365.76), (286.50961408, -365.76), (286.50961408, -111.76), align=None)
    extrude(amount=-CUT_EXTRUDE12_DEPTH, mode=Mode.SUBTRACT)

    # Sketch21 → Cut-Extrude13 (cut, up to next)
    with BuildSketch(Plane.XY, mode=Mode.PRIVATE) as cut_extrude13_sk1:
        with Locations((-273.813253039, 14.604999999)):
            Rectangle(SKETCH21_W, SKETCH21_H)
    cut_extrude13_tool1 = extrude(cut_extrude13_sk1.sketch, amount=-CUT_EXTRUDE13_REACH, mode=Mode.PRIVATE) & part.part
    # Sketch21 → Cut-Extrude13 (cut, up to next)
    with BuildSketch(Plane.XY, mode=Mode.PRIVATE) as cut_extrude13_sk2:
        with Locations((273.813253039, 14.604999999)):
            Rectangle(SKETCH21_W, SKETCH21_H)
    cut_extrude13_tool2 = extrude(cut_extrude13_sk2.sketch, amount=-CUT_EXTRUDE13_REACH, mode=Mode.PRIVATE) & part.part
    add(cut_extrude13_tool1.solids().sort_by_distance((-273.813253, 14.605, 0))[0], mode=Mode.SUBTRACT)
    add(cut_extrude13_tool2.solids().sort_by_distance((273.813253, 14.605, 0))[0], mode=Mode.SUBTRACT)

    # Sketch21 → Cut-Extrude13 direction 2 (cut, up to next)
    with BuildSketch(Plane.XY, mode=Mode.PRIVATE) as cut_extrude13_direction_2_sk1:
        with Locations((-273.813253039, 14.604999999)):
            Rectangle(SKETCH21_W, SKETCH21_H)
    cut_extrude13_direction_2_tool1 = extrude(cut_extrude13_direction_2_sk1.sketch, amount=CUT_EXTRUDE13_DIRECTION_2_REACH, mode=Mode.PRIVATE) & part.part
    # Sketch21 → Cut-Extrude13 direction 2 (cut, up to next)
    with BuildSketch(Plane.XY, mode=Mode.PRIVATE) as cut_extrude13_direction_2_sk2:
        with Locations((273.813253039, 14.604999999)):
            Rectangle(SKETCH21_W, SKETCH21_H)
    cut_extrude13_direction_2_tool2 = extrude(cut_extrude13_direction_2_sk2.sketch, amount=CUT_EXTRUDE13_DIRECTION_2_REACH, mode=Mode.PRIVATE) & part.part
    add(cut_extrude13_direction_2_tool1.solids().sort_by_distance((-273.813253, 14.605, 0))[0], mode=Mode.SUBTRACT)
    add(cut_extrude13_direction_2_tool2.solids().sort_by_distance((273.813253, 14.605, 0))[0], mode=Mode.SUBTRACT)

    # Sketch22 → Boss-Extrude8 (add)
    with BuildSketch(Plane.XY):
        with Locations((-172.20961408, -31.648409247)):
            Rectangle(SKETCH22_W, SKETCH22_H)
        with Locations((172.20961408, -31.648409247)):
            Rectangle(SKETCH22_W, SKETCH22_H)
    boss_extrude8 = extrude(amount=BOSS_EXTRUDE8_DEPTH)

    # Mirror2: Boss-Extrude8 across plane
    add(boss_extrude8.mirror(Plane(origin=(0, 0, -55.88), x_dir=(1, 0, 0), z_dir=(0, 0, -1))))

    # Sketch23 → Boss-Extrude9 (add)
    with BuildSketch(Plane.XZ.offset(-11.429999999)):
        with Locations((172.20961408, -55.88)):
            Rectangle(SKETCH23_W, SKETCH23_H)
        with Locations((-172.20961408, -55.88)):
            Rectangle(SKETCH23_W, SKETCH23_H)
    extrude(amount=-BOSS_EXTRUDE9_DEPTH)

    # Sketch24 → Boss-Extrude10 (add, two sides: drawn at the far end of the back side and taken through both)
    with BuildSketch(Plane.XZ.offset(34.823409247).offset(-BOSS_EXTRUDE10_DEPTH_BACK)):
        with Locations(Location((172.20961408, -124.46, 0), (0, 0, 270))):
            Circle(SKETCH24_R)
        with Locations(Location((172.20961408, 12.7, 0), (0, 0, 270))):
            Circle(SKETCH24_R)
        with Locations(Location((-172.237471997, 12.7, 0), (0, 0, 270))):
            Circle(SKETCH24_R)
        with Locations(Location((-172.237471997, -124.46, 0), (0, 0, 270))):
            Circle(SKETCH24_R)
    extrude(amount=BOSS_EXTRUDE10_DEPTH + BOSS_EXTRUDE10_DEPTH_BACK)


solid = part.part
